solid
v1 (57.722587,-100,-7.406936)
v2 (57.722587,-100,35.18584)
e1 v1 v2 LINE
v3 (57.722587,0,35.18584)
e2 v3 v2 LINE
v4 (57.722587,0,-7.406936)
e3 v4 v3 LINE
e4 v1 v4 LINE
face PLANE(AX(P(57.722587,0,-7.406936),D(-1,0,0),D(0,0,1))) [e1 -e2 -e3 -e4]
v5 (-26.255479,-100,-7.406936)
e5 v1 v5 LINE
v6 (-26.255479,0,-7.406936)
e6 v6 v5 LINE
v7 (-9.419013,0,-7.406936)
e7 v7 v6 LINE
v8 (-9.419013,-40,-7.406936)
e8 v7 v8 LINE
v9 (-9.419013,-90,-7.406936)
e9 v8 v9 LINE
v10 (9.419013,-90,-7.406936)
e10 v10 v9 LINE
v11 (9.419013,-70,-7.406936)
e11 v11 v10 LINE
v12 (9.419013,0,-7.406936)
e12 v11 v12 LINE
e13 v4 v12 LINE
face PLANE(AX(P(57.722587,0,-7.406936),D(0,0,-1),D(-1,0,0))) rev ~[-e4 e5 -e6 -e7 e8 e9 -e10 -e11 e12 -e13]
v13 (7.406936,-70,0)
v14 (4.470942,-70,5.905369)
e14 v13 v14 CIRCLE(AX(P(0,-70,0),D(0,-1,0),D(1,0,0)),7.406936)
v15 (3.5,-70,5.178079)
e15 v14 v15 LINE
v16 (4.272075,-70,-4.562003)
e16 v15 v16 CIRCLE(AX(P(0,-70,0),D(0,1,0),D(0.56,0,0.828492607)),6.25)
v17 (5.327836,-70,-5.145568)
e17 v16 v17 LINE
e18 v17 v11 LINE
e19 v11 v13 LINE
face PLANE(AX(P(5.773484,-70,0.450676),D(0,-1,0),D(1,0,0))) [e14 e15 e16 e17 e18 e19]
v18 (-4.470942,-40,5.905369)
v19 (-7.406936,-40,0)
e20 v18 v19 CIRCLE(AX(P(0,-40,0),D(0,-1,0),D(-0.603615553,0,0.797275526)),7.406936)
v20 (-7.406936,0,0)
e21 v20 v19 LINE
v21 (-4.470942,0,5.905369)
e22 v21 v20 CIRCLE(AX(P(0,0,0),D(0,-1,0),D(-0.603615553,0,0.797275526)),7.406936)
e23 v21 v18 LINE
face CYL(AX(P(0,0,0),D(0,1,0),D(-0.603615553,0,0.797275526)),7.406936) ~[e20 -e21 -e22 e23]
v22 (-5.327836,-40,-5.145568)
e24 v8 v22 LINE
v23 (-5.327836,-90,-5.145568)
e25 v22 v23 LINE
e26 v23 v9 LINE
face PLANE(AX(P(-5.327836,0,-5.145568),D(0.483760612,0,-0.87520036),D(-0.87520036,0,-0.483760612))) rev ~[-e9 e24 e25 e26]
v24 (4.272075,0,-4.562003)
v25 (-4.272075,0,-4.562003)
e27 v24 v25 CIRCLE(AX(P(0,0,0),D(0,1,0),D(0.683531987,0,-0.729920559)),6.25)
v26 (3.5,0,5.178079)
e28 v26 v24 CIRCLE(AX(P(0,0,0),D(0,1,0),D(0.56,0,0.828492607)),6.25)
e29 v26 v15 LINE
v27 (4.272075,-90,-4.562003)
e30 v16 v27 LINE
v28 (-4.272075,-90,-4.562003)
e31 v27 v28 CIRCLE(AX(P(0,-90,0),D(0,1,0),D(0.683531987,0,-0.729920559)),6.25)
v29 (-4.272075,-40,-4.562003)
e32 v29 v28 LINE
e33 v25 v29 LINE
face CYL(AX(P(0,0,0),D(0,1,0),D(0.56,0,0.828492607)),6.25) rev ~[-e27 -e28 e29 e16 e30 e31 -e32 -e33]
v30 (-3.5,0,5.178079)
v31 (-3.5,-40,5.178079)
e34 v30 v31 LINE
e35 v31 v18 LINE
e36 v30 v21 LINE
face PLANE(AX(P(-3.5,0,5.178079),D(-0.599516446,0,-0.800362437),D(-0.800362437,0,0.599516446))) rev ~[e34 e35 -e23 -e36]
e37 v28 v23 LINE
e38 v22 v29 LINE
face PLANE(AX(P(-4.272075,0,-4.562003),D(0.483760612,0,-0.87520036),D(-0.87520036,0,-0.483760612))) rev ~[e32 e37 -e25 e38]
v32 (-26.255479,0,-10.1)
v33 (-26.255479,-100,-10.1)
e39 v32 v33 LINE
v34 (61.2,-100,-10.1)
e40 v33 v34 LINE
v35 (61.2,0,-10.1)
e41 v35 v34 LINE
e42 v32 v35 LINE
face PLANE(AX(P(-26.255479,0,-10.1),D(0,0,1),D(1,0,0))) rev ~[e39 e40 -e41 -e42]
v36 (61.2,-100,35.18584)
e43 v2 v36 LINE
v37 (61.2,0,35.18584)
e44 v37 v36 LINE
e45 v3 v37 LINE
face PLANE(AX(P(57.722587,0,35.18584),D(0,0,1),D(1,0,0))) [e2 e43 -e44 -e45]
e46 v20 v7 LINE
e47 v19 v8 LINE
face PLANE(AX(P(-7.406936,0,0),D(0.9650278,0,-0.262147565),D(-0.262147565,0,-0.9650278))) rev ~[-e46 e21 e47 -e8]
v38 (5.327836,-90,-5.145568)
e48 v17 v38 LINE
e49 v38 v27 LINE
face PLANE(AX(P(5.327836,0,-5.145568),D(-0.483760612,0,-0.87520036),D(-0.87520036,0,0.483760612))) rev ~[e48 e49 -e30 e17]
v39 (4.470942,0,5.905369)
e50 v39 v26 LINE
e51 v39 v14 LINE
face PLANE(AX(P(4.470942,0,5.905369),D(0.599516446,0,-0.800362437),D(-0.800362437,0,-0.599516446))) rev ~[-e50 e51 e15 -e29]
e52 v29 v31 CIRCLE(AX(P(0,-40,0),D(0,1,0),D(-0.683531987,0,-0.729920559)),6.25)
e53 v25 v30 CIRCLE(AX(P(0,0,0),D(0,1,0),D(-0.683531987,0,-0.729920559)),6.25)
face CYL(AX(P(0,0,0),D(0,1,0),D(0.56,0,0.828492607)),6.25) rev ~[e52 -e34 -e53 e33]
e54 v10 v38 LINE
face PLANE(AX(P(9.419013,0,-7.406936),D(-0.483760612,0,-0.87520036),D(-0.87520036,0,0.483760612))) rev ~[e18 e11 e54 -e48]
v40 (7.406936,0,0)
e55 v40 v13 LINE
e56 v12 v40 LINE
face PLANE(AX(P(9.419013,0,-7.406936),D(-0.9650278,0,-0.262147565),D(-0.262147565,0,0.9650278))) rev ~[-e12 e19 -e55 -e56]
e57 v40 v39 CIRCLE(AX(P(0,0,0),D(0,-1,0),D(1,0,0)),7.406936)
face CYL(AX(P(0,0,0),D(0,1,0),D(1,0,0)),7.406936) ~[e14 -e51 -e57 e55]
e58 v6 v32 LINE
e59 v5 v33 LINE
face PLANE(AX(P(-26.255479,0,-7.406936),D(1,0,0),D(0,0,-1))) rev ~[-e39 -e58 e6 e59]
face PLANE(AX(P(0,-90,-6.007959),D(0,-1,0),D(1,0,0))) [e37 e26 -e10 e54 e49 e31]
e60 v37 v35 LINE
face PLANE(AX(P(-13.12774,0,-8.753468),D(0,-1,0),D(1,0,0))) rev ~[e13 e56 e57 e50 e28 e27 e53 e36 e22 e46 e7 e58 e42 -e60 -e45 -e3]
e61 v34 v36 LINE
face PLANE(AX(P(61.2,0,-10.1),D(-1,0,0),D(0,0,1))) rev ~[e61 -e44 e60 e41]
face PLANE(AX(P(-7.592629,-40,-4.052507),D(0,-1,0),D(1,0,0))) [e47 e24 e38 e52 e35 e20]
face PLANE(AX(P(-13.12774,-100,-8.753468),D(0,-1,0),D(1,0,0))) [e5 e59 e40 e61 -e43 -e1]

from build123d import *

# Parameters (mm, degrees)
F1_DEPTH = 90
F2_DEPTH = 40
F0_W     = 3.4774128616
F0_H     = 42.5927758359
F3_DEPTH = 100
F4_DEPTH = 70


# Not quite as in the source:
# - a feature names something its author has since deleted; it is built from what else it names


with BuildPart() as f1:
    # F0 (on Front) → F1 (new body)
    with BuildSketch(Plane.XZ):
        with BuildLine():
            ThreePointArc((4.2720749172, -4.5620034965), (0, -6.25), (-4.2720749172, -4.5620034965))
            Line((-4.2720749172, -4.5620034965), (-5.3278356976, -5.1455675625))
            ThreePointArc((-5.3278356976, -5.1455675625), (-2.8939428024, -6.818195789), (0, -7.4069358551))
            ThreePointArc((0, -7.4069358551), (2.8939428024, -6.818195789), (5.3278356976, -5.1455675625))
            Line((5.3278356976, -5.1455675625), (4.2720749172, -4.5620034965))
        make_face()
        with BuildLine():
            Line((9.4190128148, -7.4069358551), (5.3278356976, -5.1455675625))
            ThreePointArc((5.3278356976, -5.1455675625), (2.8939428024, -6.818195789), (0, -7.4069358551))
            Line((0, -7.4069358551), (9.4190128148, -7.4069358551))
        make_face()
        with BuildLine():
            ThreePointArc((0, -7.4069358551), (-2.8939428024, -6.818195789), (-5.3278356976, -5.1455675625))
            Line((-5.3278356976, -5.1455675625), (-9.4190128148, -7.4069358551))
            Line((-9.4190128148, -7.4069358551), (0, -7.4069358551))
        make_face()
        Polygon((9.4190128148, -7.4069358551), (0, -7.4069358551), (0, -10.1), (61.2, -10.1), (61.2, -7.4069358551), (57.7225871384, -7.4069358551), align=None)
    extrude(amount=F1_DEPTH)

    # F0 (on Front) → F2 (join)
    with BuildSketch(Plane.XZ):
        with BuildLine():
            Line((-9.4190128148, -7.4069358551), (-5.3278356976, -5.1455675625))
            ThreePointArc((-5.3278356976, -5.1455675625), (-6.8675190578, -2.7748658979), (-7.4069358551, 0))
            Line((-7.4069358551, 0), (-9.4190128148, -7.4069358551))
        make_face()
        with BuildLine():
            ThreePointArc((-4.2720749172, -4.5620034965), (-6.230456475, 0.4938745919), (-3.5, 5.1780787943))
            Line((-3.5, 5.1780787943), (-4.4709416805, 5.9053686803))
            ThreePointArc((-4.4709416805, 5.9053686803), (-6.6324458912, 3.2974778636), (-7.4069358551, 0))
            ThreePointArc((-7.4069358551, 0), (-6.8675190578, -2.7748658979), (-5.3278356976, -5.1455675625))
            Line((-5.3278356976, -5.1455675625), (-4.2720749172, -4.5620034965))
        make_face()
        with BuildLine():
            ThreePointArc((3.5, 5.1780787943), (6.230456475, 0.4938745919), (4.2720749172, -4.5620034965))
            Line((4.2720749172, -4.5620034965), (5.3278356976, -5.1455675625))
            ThreePointArc((5.3278356976, -5.1455675625), (6.8675190578, -2.7748658979), (7.4069358551, 0))
            ThreePointArc((7.4069358551, 0), (6.6324458912, 3.2974778636), (4.4709416805, 5.9053686803))
            Line((4.4709416805, 5.9053686803), (3.5, 5.1780787943))
        make_face()
        with BuildLine():
            ThreePointArc((7.4069358551, 0), (6.8675190578, -2.7748658979), (5.3278356976, -5.1455675625))
            Line((5.3278356976, -5.1455675625), (9.4190128148, -7.4069358551))
            Line((9.4190128148, -7.4069358551), (7.4069358551, 0))
        make_face()
    extrude(amount=F2_DEPTH)

    # F0 (on Front) → F3 (join)
    with BuildSketch(Plane.XZ):
        Polygon((0, -10.1), (0, -7.4069358551), (-9.4190128148, -7.4069358551), (-26.2554790825, -7.4069358551), (-26.2554790825, -10.1), align=None)
        Polygon((9.4190128148, -7.4069358551), (0, -7.4069358551), (0, -10.1), (61.2, -10.1), (61.2, -7.4069358551), (57.7225871384, -7.4069358551), align=None)
        with Locations((59.4612935692, 13.8894520629)):
            Rectangle(F0_W, F0_H)
    extrude(amount=F3_DEPTH)

    # F0 (on Front) → F4 (join)
    with BuildSketch(Plane.XZ):
        with BuildLine():
            ThreePointArc((3.5, 5.1780787943), (6.230456475, 0.4938745919), (4.2720749172, -4.5620034965))
            Line((4.2720749172, -4.5620034965), (5.3278356976, -5.1455675625))
            ThreePointArc((5.3278356976, -5.1455675625), (6.8675190578, -2.7748658979), (7.4069358551, 0))
            ThreePointArc((7.4069358551, 0), (6.6324458912, 3.2974778636), (4.4709416805, 5.9053686803))
            Line((4.4709416805, 5.9053686803), (3.5, 5.1780787943))
        make_face()
        with BuildLine():
            ThreePointArc((7.4069358551, 0), (6.8675190578, -2.7748658979), (5.3278356976, -5.1455675625))
            Line((5.3278356976, -5.1455675625), (9.4190128148, -7.4069358551))
            Line((9.4190128148, -7.4069358551), (7.4069358551, 0))
        make_face()
    extrude(amount=F4_DEPTH)


solid = f1.part
